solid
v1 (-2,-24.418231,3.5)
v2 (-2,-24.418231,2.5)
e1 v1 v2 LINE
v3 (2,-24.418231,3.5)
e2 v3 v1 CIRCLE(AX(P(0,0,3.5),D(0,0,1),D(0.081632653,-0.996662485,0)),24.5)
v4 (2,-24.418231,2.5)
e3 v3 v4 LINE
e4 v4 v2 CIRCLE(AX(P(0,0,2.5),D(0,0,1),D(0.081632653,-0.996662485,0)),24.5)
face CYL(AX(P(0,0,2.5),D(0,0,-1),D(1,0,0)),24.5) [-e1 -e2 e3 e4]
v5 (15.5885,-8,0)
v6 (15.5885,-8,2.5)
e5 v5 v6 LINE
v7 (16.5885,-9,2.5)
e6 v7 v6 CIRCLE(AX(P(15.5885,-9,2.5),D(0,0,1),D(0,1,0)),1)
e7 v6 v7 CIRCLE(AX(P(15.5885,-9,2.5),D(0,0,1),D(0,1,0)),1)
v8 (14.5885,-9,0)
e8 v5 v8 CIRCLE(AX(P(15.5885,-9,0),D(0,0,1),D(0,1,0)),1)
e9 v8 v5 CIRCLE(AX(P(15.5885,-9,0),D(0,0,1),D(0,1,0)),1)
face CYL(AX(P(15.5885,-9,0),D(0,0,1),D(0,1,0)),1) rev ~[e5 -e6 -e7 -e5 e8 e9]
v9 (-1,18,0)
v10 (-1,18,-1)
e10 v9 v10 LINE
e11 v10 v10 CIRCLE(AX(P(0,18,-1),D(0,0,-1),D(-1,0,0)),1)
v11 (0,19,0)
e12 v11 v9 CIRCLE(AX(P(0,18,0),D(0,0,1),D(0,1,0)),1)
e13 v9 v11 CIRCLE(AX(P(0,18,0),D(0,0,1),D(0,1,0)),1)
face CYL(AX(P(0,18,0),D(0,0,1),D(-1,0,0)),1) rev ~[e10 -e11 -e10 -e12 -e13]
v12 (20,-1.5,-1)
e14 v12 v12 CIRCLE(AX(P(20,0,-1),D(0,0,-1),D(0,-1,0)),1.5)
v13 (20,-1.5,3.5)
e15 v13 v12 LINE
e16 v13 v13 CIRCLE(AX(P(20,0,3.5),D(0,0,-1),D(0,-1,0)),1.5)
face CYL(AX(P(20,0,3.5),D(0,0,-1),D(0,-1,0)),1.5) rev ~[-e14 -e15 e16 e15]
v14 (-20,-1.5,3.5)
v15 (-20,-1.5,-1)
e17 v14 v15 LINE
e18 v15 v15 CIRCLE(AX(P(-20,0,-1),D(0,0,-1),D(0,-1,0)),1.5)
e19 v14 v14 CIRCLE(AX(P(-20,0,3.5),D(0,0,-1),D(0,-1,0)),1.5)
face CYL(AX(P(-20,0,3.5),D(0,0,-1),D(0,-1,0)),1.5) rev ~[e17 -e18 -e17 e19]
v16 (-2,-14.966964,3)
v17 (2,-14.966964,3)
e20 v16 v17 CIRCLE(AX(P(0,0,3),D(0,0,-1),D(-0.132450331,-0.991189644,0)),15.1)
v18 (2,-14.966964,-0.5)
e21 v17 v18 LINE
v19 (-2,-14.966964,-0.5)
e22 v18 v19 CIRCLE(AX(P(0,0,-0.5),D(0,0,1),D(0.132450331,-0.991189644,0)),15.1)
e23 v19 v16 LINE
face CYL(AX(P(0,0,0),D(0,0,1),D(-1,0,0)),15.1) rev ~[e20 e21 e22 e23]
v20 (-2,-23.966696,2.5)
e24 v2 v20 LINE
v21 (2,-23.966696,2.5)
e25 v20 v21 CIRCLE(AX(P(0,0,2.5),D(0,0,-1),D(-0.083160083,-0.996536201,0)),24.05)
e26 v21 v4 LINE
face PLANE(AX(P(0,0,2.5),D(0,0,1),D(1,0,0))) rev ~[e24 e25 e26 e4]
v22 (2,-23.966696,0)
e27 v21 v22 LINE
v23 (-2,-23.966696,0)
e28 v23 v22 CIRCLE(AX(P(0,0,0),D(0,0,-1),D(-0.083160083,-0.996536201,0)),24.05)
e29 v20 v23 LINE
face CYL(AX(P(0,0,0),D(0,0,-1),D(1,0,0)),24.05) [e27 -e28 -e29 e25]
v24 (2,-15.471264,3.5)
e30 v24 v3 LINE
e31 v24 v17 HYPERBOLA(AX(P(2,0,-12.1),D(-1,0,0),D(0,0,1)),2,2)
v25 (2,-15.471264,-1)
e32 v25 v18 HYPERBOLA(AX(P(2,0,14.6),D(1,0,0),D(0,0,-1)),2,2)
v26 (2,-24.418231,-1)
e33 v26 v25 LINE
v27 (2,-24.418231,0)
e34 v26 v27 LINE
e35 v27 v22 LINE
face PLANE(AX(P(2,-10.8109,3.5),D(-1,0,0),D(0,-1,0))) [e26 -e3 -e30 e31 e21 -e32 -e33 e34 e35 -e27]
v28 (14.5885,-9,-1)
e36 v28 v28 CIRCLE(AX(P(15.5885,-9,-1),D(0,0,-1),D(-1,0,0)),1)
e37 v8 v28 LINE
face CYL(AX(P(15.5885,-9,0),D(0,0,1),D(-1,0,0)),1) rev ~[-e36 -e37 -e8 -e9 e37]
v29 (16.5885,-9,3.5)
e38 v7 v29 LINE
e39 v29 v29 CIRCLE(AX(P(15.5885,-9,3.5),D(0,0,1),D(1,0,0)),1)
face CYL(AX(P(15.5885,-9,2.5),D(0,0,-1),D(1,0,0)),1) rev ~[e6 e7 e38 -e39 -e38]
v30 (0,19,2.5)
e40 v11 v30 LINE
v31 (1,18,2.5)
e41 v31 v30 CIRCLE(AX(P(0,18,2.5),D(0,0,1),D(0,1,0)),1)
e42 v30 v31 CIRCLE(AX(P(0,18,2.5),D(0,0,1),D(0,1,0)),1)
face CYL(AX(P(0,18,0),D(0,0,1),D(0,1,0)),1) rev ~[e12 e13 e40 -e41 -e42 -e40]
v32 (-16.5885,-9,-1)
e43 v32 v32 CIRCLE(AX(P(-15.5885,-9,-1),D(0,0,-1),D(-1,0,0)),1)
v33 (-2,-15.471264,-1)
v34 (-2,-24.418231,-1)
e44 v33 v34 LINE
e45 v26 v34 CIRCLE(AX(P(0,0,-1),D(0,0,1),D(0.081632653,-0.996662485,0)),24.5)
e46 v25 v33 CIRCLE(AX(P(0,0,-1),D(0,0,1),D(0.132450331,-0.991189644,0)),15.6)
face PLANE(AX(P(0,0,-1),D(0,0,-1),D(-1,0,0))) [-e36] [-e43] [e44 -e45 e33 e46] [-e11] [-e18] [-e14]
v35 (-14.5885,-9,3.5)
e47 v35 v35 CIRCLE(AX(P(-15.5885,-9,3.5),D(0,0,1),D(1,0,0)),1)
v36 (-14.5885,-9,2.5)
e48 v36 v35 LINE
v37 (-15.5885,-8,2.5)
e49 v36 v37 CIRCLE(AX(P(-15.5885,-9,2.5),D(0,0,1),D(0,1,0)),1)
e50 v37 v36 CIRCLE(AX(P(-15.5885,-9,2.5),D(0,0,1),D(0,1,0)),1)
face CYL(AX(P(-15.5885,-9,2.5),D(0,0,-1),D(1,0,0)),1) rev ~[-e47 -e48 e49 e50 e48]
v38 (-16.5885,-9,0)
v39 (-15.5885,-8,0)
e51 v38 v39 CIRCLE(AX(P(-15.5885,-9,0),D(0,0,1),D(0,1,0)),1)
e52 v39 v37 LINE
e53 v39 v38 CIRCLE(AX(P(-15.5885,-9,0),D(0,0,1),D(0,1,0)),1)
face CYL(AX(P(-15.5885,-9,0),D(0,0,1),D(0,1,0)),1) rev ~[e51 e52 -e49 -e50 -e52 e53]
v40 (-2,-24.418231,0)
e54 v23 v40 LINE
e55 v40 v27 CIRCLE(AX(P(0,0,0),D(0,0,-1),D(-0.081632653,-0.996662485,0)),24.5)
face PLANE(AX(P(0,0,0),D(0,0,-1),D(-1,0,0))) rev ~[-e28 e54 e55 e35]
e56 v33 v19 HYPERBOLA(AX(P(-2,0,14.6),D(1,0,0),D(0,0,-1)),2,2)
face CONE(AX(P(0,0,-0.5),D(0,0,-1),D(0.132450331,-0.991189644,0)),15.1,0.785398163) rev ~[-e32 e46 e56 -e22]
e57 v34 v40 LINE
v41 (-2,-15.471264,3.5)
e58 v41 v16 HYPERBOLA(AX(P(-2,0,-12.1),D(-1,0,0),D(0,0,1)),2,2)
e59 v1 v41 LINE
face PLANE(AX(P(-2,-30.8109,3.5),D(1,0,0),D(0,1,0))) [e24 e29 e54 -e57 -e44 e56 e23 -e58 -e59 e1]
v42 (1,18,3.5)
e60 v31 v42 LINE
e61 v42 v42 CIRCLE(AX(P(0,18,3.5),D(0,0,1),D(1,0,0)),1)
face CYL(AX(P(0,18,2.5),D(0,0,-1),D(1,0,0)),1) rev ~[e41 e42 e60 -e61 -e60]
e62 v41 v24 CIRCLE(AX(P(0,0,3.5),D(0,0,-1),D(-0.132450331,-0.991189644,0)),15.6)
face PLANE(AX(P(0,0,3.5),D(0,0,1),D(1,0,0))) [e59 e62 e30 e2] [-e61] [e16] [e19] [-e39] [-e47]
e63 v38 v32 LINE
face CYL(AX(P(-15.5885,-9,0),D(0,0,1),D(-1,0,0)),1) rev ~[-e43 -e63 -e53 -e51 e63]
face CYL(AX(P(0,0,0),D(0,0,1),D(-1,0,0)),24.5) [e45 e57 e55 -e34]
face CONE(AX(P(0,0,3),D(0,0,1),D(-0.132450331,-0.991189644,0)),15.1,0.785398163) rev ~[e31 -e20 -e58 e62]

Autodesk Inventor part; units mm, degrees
ref_plane "YZ Plane" through (0, 0, 0) normal (1, 0, 0) x (0, 1, 0)
ref_plane "XZ Plane" through (0, 0, 0) normal (0, 1, 0) x (-1, 0, 0)
ref_plane "XY Plane" through (0, 0, 0) normal (0, 0, 1) x (1, 0, 0)
sketch "Sketch1" plane through (0, 0, 0) normal (0, 0, 1) x (1, 0, 0)
  circle A0 centre (0, 0) radius 15.1
  circle A1 centre (0, 0) radius 24.05
  point P0 (0, 18)
  point P1 (-15.5885, -9)
  point P2 (15.5885, -9)
  dimension "D1" = 30.2
  dimension "d1" = 48.1
  dimension "d2" = 18
  dimension "d5" = 360
extrude "Extrusion1" add sketch "Sketch1" along normal blind 2.5
hole "Hole1" at (0, 18, 0) at (-15.5885, -9, 0) at (15.5885, -9, 0) direction (0, 0, 1) diameter 2 end through all
sketch "Sketch2" plane through (0, 0, 2.5) normal (0, 0, 1) x (1, 0, 0)
  circle A0 centre (0, 0) radius 24.5
  circle A1 centre (0, 18) radius 1 projected
  circle A2 centre (0, 0) radius 15.1 projected
  circle A3 centre (-15.5885, -9) radius 1 projected
  circle A4 centre (15.5885, -9) radius 1 projected
  dimension "d16" = 49
extrude "Extrusion2" add sketch "Sketch2" along normal blind 1
sketch "Sketch3" plane through (0, 0, 0) normal (0, 0, -1) x (-1, 0, 0)
  circle A0 centre (0, 0) radius 24.5
  circle A1 centre (0, 18) radius 1 projected
  circle A2 centre (0, 0) radius 15.1 projected
  circle A3 centre (-15.5885, -9) radius 1 projected
  circle A4 centre (15.5885, -9) radius 1 projected
  dimension "d21" = 49
extrude "Extrusion3" add sketch "Sketch3" along normal blind 1
sketch "Sketch4" plane through (0, 0, 3.5) normal (0, 0, 1) x (1, 0, 0)
  line L0 (2, -30.8109) -> (-2, -30.8109)
  line L1 (-2, -30.8109) -> (-2, -10.8109)
  line L2 (-2, -10.8109) -> (2, -10.8109)
  line L3 (2, -10.8109) -> (2, -30.8109)
  line L4 (2, -30.8109) -> (-2, -10.8109) construction
  line L5 (-2, -30.8109) -> (2, -10.8109) construction
  line L6 (0, -41.8731) -> (0, 35.5622) projected
  point P0 (0, 0)
  point P1 (0, -20.8109)
  dimension "d22" = 4
  dimension "d23" = 20
  dimension "d33" = 0
extrude "Extrusion4" cut sketch "Sketch4" against normal through all
sketch "Sketch5" plane through (0, 0, 3.5) normal (0, 0, 1) x (1, 0, 0)
  point P0 (0, 0)
  point P1 (-20, 0)
  point P2 (20, 0)
hole "Hole2" at (-20, 0, 3.5) at (20, 0, 3.5) direction (0, 0, -1) diameter 3 end through all
chamfer "Chamfer1" distance 0.5 angle 45 2 edges at (0, 15.1, 3.5) (0, 15.1, -1)
properties part number "Adapter-MitutoyoMT1-SM2-v4(flex)-forDLP"
